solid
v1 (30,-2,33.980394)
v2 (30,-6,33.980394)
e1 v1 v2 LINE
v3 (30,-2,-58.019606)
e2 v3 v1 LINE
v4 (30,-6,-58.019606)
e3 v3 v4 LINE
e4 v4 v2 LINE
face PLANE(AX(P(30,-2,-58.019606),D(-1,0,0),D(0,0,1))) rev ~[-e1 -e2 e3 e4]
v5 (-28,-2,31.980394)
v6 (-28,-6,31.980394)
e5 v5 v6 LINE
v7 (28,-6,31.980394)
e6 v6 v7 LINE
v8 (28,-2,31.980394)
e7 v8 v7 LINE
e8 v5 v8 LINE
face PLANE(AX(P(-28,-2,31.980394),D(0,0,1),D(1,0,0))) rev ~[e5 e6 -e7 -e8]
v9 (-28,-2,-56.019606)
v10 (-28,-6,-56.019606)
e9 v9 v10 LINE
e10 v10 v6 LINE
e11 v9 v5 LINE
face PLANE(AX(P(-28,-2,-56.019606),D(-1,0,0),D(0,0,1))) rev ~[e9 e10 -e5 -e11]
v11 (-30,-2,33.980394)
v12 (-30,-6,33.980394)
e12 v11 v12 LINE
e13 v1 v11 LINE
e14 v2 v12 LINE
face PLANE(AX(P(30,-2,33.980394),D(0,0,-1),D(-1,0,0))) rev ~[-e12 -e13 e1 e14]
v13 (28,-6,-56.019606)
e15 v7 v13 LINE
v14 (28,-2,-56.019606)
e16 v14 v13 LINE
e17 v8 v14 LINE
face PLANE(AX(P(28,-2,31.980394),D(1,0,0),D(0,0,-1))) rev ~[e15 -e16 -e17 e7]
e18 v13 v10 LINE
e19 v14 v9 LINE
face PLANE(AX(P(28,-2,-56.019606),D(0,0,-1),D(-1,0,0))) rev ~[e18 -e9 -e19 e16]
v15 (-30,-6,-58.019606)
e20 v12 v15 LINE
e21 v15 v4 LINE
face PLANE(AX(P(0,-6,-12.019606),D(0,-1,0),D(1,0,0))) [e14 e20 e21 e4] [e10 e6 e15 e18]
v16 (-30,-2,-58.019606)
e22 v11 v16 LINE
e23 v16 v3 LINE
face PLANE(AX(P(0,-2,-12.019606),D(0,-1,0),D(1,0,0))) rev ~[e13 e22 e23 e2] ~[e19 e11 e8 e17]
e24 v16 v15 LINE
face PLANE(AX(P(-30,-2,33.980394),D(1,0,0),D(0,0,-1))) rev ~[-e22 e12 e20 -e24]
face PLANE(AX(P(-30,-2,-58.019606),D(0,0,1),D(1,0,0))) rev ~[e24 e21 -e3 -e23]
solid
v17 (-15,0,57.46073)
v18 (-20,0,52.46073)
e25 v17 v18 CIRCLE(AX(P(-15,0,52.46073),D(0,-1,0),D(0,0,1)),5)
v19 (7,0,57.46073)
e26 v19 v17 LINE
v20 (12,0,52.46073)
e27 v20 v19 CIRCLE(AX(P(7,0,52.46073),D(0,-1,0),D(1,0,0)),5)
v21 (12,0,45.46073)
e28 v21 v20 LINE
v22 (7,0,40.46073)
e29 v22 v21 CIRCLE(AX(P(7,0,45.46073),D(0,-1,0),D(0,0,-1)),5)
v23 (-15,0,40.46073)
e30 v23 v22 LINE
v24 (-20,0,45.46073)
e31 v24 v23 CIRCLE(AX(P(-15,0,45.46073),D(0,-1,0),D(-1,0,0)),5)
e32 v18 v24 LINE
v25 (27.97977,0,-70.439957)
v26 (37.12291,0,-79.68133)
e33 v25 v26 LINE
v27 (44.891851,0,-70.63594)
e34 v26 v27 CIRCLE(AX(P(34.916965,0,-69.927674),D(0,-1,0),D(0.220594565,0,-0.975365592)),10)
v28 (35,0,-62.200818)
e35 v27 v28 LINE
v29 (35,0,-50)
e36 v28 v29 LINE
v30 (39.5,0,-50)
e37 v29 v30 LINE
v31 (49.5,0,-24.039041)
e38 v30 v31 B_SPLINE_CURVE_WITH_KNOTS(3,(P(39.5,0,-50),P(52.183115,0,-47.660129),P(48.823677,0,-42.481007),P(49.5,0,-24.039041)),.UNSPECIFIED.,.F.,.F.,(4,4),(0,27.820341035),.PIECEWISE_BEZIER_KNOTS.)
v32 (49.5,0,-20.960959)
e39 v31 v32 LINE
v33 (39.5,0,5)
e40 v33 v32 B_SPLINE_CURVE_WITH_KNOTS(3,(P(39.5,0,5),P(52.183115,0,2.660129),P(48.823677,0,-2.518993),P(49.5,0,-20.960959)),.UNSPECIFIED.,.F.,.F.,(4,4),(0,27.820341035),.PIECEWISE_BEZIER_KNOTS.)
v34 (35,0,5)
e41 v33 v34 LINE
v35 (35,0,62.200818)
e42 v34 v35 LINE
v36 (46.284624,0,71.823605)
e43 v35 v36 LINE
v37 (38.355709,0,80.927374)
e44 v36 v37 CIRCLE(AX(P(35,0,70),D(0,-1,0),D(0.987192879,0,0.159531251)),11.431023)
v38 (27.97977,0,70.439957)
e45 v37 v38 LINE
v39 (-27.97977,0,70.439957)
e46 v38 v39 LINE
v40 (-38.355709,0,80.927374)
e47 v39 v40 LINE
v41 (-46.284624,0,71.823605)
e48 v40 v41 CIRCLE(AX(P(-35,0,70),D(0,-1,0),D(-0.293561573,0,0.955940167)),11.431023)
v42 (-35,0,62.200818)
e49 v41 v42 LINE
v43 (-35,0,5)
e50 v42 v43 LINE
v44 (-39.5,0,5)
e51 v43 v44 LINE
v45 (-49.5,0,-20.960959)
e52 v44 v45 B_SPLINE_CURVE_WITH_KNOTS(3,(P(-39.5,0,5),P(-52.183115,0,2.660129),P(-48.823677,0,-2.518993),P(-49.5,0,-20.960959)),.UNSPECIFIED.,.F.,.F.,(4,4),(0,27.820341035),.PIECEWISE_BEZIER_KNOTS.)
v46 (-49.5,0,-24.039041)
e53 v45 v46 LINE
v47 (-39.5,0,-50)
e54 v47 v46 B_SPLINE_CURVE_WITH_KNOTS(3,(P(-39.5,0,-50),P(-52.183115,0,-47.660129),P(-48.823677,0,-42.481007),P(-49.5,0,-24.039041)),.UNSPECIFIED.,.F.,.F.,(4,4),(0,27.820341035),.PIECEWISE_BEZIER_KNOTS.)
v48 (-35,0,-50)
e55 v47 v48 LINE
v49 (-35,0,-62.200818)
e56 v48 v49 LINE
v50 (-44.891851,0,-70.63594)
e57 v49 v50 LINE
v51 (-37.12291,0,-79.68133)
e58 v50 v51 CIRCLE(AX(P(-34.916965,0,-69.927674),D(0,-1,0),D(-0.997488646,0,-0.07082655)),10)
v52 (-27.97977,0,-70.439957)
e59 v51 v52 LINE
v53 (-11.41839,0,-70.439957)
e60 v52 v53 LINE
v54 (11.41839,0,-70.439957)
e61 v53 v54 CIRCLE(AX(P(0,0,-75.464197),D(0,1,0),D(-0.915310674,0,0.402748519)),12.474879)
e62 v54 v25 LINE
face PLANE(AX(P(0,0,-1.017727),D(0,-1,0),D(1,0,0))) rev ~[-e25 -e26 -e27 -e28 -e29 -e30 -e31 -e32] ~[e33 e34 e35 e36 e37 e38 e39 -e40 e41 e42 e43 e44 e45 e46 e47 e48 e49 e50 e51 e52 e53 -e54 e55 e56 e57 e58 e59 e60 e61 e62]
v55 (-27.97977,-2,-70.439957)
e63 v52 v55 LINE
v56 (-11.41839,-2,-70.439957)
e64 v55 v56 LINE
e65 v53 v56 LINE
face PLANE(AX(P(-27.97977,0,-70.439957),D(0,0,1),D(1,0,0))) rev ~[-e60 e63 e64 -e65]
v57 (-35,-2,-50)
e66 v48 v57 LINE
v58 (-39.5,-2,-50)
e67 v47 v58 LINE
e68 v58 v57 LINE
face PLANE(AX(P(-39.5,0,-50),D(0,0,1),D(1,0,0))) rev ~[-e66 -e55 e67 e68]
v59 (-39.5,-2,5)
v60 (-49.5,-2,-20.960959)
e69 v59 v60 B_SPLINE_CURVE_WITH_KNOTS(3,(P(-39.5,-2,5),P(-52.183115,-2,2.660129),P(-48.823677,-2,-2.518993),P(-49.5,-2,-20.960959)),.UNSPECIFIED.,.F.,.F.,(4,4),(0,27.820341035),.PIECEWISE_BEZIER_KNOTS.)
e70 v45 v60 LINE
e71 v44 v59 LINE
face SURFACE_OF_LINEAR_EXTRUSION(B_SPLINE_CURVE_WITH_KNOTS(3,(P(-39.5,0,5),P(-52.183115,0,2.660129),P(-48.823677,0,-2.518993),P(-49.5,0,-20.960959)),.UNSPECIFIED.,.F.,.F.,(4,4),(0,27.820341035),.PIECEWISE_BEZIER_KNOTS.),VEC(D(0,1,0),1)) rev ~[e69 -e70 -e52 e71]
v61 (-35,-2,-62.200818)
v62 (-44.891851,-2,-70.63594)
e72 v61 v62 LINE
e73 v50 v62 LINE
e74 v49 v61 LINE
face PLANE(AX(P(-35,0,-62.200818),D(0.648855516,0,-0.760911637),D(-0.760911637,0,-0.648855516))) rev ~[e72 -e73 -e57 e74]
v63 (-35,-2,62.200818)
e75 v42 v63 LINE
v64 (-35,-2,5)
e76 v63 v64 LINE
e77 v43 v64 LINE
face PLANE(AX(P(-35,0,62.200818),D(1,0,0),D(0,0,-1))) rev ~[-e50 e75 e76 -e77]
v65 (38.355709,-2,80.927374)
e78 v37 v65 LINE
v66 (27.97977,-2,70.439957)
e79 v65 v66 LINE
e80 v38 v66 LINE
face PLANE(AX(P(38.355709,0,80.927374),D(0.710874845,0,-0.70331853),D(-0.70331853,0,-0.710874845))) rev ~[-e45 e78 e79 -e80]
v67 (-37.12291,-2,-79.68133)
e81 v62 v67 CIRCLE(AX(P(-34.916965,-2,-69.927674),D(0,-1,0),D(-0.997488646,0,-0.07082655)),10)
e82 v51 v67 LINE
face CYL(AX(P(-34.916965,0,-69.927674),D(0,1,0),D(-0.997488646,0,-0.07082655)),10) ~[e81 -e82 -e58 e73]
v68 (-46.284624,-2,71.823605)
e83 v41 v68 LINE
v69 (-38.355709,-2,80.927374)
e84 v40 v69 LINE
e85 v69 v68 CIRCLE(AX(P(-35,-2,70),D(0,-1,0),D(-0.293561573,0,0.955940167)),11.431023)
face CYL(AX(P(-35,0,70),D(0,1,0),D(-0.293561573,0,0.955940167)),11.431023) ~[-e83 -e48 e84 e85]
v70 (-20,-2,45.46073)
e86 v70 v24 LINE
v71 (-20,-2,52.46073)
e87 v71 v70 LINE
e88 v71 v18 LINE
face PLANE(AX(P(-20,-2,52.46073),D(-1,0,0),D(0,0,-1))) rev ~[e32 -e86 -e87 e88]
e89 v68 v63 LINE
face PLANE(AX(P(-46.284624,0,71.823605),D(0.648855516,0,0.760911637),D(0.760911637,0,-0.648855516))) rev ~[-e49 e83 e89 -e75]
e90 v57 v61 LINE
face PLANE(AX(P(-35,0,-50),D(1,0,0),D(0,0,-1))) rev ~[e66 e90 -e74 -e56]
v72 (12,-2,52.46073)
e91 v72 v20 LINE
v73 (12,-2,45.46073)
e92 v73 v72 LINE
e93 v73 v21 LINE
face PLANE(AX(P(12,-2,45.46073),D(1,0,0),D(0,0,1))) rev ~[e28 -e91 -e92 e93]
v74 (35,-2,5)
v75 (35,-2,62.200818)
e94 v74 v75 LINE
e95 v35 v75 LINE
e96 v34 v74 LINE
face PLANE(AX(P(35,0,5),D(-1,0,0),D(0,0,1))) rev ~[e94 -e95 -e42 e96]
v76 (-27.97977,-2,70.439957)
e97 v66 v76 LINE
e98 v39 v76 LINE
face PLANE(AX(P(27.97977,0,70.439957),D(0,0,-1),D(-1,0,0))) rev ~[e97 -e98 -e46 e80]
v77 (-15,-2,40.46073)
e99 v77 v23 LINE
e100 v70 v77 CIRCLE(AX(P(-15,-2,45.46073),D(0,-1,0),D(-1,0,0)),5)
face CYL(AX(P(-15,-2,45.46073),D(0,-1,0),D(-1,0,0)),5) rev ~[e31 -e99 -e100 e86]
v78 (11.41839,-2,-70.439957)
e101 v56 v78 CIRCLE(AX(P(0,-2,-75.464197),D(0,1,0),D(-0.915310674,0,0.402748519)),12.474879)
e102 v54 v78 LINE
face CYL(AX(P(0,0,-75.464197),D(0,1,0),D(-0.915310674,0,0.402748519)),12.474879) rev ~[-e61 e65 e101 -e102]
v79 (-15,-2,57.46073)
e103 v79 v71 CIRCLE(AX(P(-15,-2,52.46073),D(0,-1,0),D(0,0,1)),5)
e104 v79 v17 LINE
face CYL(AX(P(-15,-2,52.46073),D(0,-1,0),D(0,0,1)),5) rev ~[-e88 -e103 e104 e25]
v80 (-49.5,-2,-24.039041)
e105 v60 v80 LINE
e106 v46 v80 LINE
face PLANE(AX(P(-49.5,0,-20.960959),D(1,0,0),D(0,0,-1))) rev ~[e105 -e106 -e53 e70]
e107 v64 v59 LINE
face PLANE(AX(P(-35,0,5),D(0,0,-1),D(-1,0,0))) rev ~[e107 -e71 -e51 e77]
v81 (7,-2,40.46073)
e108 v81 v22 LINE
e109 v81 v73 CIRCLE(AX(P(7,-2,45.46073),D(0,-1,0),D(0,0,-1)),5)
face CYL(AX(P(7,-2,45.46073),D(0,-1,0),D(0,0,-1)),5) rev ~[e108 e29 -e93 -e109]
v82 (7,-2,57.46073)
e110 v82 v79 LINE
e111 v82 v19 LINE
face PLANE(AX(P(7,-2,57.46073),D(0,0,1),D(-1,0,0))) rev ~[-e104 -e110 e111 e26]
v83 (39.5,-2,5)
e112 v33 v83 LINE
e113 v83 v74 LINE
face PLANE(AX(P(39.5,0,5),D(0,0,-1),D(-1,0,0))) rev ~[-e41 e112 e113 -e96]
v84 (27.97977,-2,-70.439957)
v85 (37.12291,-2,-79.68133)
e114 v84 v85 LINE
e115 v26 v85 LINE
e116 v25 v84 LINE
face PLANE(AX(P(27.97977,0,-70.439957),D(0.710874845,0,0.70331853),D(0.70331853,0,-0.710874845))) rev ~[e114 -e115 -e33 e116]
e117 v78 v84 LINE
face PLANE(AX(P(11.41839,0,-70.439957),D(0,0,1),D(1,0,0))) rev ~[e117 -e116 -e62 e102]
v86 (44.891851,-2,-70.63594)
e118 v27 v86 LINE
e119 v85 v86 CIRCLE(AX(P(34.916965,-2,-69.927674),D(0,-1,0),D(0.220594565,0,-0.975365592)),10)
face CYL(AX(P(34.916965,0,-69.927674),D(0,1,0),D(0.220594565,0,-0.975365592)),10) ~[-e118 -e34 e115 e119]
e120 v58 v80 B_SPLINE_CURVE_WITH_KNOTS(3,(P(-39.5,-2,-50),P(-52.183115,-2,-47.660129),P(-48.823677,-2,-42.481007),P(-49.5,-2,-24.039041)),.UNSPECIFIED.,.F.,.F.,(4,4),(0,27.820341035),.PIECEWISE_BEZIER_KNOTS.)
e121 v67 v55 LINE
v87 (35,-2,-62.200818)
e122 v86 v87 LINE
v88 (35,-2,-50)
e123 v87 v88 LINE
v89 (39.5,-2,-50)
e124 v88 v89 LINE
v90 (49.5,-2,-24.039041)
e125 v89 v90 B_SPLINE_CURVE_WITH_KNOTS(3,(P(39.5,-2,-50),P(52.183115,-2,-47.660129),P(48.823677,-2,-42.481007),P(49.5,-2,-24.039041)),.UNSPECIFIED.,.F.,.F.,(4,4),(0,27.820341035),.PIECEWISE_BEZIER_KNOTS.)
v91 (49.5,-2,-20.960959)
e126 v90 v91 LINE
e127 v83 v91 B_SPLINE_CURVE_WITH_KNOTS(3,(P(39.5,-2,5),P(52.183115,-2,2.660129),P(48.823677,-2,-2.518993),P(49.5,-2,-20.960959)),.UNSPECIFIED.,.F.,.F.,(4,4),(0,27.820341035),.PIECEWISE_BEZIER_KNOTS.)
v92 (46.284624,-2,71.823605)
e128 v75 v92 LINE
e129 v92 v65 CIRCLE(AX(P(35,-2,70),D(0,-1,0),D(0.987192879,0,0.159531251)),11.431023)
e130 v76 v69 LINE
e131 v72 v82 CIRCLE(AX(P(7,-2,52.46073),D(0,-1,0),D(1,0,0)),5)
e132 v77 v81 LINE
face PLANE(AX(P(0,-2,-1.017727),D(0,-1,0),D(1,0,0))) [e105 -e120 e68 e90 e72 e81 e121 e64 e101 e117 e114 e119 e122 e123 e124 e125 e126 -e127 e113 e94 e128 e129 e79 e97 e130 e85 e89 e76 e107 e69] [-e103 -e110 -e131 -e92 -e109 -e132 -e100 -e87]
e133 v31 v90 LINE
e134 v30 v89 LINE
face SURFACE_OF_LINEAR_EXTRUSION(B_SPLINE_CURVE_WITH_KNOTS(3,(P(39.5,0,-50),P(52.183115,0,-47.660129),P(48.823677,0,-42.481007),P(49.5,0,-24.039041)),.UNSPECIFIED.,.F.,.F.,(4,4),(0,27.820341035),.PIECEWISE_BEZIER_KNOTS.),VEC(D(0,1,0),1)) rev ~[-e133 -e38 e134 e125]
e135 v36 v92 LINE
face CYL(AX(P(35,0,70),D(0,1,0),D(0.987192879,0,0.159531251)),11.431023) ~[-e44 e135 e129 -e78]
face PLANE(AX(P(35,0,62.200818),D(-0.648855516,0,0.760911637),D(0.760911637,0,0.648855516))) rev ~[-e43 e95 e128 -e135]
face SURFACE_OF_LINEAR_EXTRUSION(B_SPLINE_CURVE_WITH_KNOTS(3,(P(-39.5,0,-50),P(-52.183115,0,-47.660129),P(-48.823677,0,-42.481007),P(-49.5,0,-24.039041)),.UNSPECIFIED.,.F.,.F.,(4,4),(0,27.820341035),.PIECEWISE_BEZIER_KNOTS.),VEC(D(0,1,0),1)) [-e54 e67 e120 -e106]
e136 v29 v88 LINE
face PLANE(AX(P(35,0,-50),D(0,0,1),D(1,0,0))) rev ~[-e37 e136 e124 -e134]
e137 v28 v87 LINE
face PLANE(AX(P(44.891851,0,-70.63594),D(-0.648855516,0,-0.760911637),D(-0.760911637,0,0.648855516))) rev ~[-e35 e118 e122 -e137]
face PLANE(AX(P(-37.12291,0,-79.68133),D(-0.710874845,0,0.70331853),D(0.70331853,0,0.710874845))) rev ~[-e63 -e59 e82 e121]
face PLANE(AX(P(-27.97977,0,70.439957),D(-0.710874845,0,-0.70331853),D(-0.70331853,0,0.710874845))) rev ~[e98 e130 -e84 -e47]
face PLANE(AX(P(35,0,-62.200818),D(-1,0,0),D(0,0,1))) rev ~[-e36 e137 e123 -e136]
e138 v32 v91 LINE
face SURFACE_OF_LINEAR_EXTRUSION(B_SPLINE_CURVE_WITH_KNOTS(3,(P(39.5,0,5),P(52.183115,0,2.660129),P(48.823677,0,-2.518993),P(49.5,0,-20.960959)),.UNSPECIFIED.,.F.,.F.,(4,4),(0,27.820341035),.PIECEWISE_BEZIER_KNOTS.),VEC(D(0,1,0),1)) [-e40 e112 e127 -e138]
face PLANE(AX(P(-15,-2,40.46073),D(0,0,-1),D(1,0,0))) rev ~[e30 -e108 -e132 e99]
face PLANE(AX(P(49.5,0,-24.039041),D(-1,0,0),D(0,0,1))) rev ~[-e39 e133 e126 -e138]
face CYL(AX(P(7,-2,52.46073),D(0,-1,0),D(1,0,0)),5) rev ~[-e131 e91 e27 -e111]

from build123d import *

# Parameters (mm, degrees)
F1_DEPTH = 2
F4_DEPTH = 3
F6_DEPTH = 4


# Not quite as in the source:
# - a feature names something its author has since deleted; it is built from what else it names


with BuildPart() as f1:
    # F0 (on Front) → F1 (new body)
    with BuildSketch(Plane.XZ):
        with BuildLine():
            Line((35, 5), (35, 62.2008182108))
            Line((35, 62.2008182108), (46.2846243068, 71.8236053681))
            ThreePointArc((46.2846243068, 71.8236053681), (43.6200052332, 77.5075823048), (38.3557090366, 80.9273738449))
            Line((38.3557090366, 80.9273738449), (27.9797695779, 70.4399573502))
            Line((27.9797695779, 70.4399573502), (-27.9797695779, 70.4399573502))
            Line((-27.9797695779, 70.4399573502), (-38.3557090366, 80.9273738449))
            ThreePointArc((-38.3557090366, 80.9273738449), (-43.6200052332, 77.5075823048), (-46.2846243068, 71.8236053681))
            Line((-46.2846243068, 71.8236053681), (-35, 62.2008182108))
            Line((-35, 62.2008182108), (-35, 5))
            Line((-35, 5), (-39.5, 5))
            add(Edge.make_bspline(
                [(-39.5, 5), (-52.1831149682, 2.6601287536), (-48.8236770034, -2.5189926382), (-49.5, -20.9609586745)],
                knots=[0, 0, 0, 0, 27.820341035, 27.820341035, 27.820341035, 27.820341035], degree=3))
            Line((-49.5, -20.9609586745), (-49.5, -24.0390413254))
            add(Edge.make_bspline(
                [(-39.5, -50), (-52.1831149682, -47.6601287536), (-48.8236770034, -42.4810073618), (-49.5, -24.0390413254)],
                knots=[0, 0, 0, 0, 27.820341035, 27.820341035, 27.820341035, 27.820341035], degree=3))
            Line((-39.5, -50), (-35, -50))
            Line((-35, -50), (-35, -62.2008182108))
            Line((-35, -62.2008182108), (-44.8918512807, -70.6359399196))
            ThreePointArc((-44.8918512807, -70.6359399196), (-42.5030006526, -76.443198976), (-37.1229104696, -79.6813303345))
            Line((-37.1229104696, -79.6813303345), (-27.9797695779, -70.4399573502))
            Line((-27.9797695779, -70.4399573502), (-11.4183901742, -70.4399573502))
            ThreePointArc((-11.4183901742, -70.4399573502), (0, -62.9893172158), (11.4183901742, -70.4399573502))
            Line((11.4183901742, -70.4399573502), (27.9797695779, -70.4399573502))
            Line((27.9797695779, -70.4399573502), (37.1229104696, -79.6813303345))
            ThreePointArc((37.1229104696, -79.6813303345), (42.5030006526, -76.443198976), (44.8918512807, -70.6359399196))
            Line((44.8918512807, -70.6359399196), (35, -62.2008182108))
            Line((35, -62.2008182108), (35, -50))
            Line((35, -50), (39.5, -50))
            add(Edge.make_bspline(
                [(39.5, -50), (52.1831149682, -47.6601287536), (48.8236770034, -42.4810073618), (49.5, -24.0390413254)],
                knots=[0, 0, 0, 0, 27.820341035, 27.820341035, 27.820341035, 27.820341035], degree=3))
            Line((49.5, -24.0390413254), (49.5, -20.9609586746))
            add(Edge.make_bspline(
                [(39.5, 5), (52.1831149682, 2.6601287536), (48.8236770034, -2.5189926382), (49.5, -20.9609586746)],
                knots=[0, 0, 0, 0, 27.820341035, 27.820341035, 27.820341035, 27.820341035], degree=3))
            Line((39.5, 5), (35, 5))
        make_face()
    extrude(amount=F1_DEPTH)

    # F3 (on offset) → F4 (cut)
    with BuildSketch(Plane.XZ.offset(2)):
        with BuildLine():
            ThreePointArc((12, 52.460730496), (10.5355339059, 55.9962644019), (7, 57.460730496))
            Line((7, 57.460730496), (-15, 57.460730496))
            ThreePointArc((-15, 57.460730496), (-18.5355339059, 55.9962644019), (-20, 52.460730496))
            Line((-20, 52.460730496), (-20, 45.460730496))
            ThreePointArc((-20, 45.460730496), (-18.5355339059, 41.9251965901), (-15, 40.460730496))
            Line((-15, 40.460730496), (7, 40.460730496))
            ThreePointArc((7, 40.460730496), (10.5355339059, 41.9251965901), (12, 45.460730496))
            Line((12, 45.460730496), (12, 52.460730496))
        make_face()
    extrude(amount=-F4_DEPTH, mode=Mode.SUBTRACT)


with BuildPart() as f6:
    # F5 (on offset) → F6 (new body)
    with BuildSketch(Plane.XZ.offset(2)):
        Polygon((-8.6902184412, 33.9803936929), (-30, 33.9803936929), (-30, -58.0196063071), (-8.6902184412, -58.0196063071), (30, -58.0196063071), (30, 33.9803936929), align=None)
        Polygon((-28, -56.0196063071), (-28, 31.9803936929), (-8.6902184412, 31.9803936929), (28, 31.9803936929), (28, -56.0196063071), (-8.6902184412, -56.0196063071), align=None, mode=Mode.SUBTRACT)
    extrude(amount=F6_DEPTH)


solid = Compound([f1.part, f6.part])
